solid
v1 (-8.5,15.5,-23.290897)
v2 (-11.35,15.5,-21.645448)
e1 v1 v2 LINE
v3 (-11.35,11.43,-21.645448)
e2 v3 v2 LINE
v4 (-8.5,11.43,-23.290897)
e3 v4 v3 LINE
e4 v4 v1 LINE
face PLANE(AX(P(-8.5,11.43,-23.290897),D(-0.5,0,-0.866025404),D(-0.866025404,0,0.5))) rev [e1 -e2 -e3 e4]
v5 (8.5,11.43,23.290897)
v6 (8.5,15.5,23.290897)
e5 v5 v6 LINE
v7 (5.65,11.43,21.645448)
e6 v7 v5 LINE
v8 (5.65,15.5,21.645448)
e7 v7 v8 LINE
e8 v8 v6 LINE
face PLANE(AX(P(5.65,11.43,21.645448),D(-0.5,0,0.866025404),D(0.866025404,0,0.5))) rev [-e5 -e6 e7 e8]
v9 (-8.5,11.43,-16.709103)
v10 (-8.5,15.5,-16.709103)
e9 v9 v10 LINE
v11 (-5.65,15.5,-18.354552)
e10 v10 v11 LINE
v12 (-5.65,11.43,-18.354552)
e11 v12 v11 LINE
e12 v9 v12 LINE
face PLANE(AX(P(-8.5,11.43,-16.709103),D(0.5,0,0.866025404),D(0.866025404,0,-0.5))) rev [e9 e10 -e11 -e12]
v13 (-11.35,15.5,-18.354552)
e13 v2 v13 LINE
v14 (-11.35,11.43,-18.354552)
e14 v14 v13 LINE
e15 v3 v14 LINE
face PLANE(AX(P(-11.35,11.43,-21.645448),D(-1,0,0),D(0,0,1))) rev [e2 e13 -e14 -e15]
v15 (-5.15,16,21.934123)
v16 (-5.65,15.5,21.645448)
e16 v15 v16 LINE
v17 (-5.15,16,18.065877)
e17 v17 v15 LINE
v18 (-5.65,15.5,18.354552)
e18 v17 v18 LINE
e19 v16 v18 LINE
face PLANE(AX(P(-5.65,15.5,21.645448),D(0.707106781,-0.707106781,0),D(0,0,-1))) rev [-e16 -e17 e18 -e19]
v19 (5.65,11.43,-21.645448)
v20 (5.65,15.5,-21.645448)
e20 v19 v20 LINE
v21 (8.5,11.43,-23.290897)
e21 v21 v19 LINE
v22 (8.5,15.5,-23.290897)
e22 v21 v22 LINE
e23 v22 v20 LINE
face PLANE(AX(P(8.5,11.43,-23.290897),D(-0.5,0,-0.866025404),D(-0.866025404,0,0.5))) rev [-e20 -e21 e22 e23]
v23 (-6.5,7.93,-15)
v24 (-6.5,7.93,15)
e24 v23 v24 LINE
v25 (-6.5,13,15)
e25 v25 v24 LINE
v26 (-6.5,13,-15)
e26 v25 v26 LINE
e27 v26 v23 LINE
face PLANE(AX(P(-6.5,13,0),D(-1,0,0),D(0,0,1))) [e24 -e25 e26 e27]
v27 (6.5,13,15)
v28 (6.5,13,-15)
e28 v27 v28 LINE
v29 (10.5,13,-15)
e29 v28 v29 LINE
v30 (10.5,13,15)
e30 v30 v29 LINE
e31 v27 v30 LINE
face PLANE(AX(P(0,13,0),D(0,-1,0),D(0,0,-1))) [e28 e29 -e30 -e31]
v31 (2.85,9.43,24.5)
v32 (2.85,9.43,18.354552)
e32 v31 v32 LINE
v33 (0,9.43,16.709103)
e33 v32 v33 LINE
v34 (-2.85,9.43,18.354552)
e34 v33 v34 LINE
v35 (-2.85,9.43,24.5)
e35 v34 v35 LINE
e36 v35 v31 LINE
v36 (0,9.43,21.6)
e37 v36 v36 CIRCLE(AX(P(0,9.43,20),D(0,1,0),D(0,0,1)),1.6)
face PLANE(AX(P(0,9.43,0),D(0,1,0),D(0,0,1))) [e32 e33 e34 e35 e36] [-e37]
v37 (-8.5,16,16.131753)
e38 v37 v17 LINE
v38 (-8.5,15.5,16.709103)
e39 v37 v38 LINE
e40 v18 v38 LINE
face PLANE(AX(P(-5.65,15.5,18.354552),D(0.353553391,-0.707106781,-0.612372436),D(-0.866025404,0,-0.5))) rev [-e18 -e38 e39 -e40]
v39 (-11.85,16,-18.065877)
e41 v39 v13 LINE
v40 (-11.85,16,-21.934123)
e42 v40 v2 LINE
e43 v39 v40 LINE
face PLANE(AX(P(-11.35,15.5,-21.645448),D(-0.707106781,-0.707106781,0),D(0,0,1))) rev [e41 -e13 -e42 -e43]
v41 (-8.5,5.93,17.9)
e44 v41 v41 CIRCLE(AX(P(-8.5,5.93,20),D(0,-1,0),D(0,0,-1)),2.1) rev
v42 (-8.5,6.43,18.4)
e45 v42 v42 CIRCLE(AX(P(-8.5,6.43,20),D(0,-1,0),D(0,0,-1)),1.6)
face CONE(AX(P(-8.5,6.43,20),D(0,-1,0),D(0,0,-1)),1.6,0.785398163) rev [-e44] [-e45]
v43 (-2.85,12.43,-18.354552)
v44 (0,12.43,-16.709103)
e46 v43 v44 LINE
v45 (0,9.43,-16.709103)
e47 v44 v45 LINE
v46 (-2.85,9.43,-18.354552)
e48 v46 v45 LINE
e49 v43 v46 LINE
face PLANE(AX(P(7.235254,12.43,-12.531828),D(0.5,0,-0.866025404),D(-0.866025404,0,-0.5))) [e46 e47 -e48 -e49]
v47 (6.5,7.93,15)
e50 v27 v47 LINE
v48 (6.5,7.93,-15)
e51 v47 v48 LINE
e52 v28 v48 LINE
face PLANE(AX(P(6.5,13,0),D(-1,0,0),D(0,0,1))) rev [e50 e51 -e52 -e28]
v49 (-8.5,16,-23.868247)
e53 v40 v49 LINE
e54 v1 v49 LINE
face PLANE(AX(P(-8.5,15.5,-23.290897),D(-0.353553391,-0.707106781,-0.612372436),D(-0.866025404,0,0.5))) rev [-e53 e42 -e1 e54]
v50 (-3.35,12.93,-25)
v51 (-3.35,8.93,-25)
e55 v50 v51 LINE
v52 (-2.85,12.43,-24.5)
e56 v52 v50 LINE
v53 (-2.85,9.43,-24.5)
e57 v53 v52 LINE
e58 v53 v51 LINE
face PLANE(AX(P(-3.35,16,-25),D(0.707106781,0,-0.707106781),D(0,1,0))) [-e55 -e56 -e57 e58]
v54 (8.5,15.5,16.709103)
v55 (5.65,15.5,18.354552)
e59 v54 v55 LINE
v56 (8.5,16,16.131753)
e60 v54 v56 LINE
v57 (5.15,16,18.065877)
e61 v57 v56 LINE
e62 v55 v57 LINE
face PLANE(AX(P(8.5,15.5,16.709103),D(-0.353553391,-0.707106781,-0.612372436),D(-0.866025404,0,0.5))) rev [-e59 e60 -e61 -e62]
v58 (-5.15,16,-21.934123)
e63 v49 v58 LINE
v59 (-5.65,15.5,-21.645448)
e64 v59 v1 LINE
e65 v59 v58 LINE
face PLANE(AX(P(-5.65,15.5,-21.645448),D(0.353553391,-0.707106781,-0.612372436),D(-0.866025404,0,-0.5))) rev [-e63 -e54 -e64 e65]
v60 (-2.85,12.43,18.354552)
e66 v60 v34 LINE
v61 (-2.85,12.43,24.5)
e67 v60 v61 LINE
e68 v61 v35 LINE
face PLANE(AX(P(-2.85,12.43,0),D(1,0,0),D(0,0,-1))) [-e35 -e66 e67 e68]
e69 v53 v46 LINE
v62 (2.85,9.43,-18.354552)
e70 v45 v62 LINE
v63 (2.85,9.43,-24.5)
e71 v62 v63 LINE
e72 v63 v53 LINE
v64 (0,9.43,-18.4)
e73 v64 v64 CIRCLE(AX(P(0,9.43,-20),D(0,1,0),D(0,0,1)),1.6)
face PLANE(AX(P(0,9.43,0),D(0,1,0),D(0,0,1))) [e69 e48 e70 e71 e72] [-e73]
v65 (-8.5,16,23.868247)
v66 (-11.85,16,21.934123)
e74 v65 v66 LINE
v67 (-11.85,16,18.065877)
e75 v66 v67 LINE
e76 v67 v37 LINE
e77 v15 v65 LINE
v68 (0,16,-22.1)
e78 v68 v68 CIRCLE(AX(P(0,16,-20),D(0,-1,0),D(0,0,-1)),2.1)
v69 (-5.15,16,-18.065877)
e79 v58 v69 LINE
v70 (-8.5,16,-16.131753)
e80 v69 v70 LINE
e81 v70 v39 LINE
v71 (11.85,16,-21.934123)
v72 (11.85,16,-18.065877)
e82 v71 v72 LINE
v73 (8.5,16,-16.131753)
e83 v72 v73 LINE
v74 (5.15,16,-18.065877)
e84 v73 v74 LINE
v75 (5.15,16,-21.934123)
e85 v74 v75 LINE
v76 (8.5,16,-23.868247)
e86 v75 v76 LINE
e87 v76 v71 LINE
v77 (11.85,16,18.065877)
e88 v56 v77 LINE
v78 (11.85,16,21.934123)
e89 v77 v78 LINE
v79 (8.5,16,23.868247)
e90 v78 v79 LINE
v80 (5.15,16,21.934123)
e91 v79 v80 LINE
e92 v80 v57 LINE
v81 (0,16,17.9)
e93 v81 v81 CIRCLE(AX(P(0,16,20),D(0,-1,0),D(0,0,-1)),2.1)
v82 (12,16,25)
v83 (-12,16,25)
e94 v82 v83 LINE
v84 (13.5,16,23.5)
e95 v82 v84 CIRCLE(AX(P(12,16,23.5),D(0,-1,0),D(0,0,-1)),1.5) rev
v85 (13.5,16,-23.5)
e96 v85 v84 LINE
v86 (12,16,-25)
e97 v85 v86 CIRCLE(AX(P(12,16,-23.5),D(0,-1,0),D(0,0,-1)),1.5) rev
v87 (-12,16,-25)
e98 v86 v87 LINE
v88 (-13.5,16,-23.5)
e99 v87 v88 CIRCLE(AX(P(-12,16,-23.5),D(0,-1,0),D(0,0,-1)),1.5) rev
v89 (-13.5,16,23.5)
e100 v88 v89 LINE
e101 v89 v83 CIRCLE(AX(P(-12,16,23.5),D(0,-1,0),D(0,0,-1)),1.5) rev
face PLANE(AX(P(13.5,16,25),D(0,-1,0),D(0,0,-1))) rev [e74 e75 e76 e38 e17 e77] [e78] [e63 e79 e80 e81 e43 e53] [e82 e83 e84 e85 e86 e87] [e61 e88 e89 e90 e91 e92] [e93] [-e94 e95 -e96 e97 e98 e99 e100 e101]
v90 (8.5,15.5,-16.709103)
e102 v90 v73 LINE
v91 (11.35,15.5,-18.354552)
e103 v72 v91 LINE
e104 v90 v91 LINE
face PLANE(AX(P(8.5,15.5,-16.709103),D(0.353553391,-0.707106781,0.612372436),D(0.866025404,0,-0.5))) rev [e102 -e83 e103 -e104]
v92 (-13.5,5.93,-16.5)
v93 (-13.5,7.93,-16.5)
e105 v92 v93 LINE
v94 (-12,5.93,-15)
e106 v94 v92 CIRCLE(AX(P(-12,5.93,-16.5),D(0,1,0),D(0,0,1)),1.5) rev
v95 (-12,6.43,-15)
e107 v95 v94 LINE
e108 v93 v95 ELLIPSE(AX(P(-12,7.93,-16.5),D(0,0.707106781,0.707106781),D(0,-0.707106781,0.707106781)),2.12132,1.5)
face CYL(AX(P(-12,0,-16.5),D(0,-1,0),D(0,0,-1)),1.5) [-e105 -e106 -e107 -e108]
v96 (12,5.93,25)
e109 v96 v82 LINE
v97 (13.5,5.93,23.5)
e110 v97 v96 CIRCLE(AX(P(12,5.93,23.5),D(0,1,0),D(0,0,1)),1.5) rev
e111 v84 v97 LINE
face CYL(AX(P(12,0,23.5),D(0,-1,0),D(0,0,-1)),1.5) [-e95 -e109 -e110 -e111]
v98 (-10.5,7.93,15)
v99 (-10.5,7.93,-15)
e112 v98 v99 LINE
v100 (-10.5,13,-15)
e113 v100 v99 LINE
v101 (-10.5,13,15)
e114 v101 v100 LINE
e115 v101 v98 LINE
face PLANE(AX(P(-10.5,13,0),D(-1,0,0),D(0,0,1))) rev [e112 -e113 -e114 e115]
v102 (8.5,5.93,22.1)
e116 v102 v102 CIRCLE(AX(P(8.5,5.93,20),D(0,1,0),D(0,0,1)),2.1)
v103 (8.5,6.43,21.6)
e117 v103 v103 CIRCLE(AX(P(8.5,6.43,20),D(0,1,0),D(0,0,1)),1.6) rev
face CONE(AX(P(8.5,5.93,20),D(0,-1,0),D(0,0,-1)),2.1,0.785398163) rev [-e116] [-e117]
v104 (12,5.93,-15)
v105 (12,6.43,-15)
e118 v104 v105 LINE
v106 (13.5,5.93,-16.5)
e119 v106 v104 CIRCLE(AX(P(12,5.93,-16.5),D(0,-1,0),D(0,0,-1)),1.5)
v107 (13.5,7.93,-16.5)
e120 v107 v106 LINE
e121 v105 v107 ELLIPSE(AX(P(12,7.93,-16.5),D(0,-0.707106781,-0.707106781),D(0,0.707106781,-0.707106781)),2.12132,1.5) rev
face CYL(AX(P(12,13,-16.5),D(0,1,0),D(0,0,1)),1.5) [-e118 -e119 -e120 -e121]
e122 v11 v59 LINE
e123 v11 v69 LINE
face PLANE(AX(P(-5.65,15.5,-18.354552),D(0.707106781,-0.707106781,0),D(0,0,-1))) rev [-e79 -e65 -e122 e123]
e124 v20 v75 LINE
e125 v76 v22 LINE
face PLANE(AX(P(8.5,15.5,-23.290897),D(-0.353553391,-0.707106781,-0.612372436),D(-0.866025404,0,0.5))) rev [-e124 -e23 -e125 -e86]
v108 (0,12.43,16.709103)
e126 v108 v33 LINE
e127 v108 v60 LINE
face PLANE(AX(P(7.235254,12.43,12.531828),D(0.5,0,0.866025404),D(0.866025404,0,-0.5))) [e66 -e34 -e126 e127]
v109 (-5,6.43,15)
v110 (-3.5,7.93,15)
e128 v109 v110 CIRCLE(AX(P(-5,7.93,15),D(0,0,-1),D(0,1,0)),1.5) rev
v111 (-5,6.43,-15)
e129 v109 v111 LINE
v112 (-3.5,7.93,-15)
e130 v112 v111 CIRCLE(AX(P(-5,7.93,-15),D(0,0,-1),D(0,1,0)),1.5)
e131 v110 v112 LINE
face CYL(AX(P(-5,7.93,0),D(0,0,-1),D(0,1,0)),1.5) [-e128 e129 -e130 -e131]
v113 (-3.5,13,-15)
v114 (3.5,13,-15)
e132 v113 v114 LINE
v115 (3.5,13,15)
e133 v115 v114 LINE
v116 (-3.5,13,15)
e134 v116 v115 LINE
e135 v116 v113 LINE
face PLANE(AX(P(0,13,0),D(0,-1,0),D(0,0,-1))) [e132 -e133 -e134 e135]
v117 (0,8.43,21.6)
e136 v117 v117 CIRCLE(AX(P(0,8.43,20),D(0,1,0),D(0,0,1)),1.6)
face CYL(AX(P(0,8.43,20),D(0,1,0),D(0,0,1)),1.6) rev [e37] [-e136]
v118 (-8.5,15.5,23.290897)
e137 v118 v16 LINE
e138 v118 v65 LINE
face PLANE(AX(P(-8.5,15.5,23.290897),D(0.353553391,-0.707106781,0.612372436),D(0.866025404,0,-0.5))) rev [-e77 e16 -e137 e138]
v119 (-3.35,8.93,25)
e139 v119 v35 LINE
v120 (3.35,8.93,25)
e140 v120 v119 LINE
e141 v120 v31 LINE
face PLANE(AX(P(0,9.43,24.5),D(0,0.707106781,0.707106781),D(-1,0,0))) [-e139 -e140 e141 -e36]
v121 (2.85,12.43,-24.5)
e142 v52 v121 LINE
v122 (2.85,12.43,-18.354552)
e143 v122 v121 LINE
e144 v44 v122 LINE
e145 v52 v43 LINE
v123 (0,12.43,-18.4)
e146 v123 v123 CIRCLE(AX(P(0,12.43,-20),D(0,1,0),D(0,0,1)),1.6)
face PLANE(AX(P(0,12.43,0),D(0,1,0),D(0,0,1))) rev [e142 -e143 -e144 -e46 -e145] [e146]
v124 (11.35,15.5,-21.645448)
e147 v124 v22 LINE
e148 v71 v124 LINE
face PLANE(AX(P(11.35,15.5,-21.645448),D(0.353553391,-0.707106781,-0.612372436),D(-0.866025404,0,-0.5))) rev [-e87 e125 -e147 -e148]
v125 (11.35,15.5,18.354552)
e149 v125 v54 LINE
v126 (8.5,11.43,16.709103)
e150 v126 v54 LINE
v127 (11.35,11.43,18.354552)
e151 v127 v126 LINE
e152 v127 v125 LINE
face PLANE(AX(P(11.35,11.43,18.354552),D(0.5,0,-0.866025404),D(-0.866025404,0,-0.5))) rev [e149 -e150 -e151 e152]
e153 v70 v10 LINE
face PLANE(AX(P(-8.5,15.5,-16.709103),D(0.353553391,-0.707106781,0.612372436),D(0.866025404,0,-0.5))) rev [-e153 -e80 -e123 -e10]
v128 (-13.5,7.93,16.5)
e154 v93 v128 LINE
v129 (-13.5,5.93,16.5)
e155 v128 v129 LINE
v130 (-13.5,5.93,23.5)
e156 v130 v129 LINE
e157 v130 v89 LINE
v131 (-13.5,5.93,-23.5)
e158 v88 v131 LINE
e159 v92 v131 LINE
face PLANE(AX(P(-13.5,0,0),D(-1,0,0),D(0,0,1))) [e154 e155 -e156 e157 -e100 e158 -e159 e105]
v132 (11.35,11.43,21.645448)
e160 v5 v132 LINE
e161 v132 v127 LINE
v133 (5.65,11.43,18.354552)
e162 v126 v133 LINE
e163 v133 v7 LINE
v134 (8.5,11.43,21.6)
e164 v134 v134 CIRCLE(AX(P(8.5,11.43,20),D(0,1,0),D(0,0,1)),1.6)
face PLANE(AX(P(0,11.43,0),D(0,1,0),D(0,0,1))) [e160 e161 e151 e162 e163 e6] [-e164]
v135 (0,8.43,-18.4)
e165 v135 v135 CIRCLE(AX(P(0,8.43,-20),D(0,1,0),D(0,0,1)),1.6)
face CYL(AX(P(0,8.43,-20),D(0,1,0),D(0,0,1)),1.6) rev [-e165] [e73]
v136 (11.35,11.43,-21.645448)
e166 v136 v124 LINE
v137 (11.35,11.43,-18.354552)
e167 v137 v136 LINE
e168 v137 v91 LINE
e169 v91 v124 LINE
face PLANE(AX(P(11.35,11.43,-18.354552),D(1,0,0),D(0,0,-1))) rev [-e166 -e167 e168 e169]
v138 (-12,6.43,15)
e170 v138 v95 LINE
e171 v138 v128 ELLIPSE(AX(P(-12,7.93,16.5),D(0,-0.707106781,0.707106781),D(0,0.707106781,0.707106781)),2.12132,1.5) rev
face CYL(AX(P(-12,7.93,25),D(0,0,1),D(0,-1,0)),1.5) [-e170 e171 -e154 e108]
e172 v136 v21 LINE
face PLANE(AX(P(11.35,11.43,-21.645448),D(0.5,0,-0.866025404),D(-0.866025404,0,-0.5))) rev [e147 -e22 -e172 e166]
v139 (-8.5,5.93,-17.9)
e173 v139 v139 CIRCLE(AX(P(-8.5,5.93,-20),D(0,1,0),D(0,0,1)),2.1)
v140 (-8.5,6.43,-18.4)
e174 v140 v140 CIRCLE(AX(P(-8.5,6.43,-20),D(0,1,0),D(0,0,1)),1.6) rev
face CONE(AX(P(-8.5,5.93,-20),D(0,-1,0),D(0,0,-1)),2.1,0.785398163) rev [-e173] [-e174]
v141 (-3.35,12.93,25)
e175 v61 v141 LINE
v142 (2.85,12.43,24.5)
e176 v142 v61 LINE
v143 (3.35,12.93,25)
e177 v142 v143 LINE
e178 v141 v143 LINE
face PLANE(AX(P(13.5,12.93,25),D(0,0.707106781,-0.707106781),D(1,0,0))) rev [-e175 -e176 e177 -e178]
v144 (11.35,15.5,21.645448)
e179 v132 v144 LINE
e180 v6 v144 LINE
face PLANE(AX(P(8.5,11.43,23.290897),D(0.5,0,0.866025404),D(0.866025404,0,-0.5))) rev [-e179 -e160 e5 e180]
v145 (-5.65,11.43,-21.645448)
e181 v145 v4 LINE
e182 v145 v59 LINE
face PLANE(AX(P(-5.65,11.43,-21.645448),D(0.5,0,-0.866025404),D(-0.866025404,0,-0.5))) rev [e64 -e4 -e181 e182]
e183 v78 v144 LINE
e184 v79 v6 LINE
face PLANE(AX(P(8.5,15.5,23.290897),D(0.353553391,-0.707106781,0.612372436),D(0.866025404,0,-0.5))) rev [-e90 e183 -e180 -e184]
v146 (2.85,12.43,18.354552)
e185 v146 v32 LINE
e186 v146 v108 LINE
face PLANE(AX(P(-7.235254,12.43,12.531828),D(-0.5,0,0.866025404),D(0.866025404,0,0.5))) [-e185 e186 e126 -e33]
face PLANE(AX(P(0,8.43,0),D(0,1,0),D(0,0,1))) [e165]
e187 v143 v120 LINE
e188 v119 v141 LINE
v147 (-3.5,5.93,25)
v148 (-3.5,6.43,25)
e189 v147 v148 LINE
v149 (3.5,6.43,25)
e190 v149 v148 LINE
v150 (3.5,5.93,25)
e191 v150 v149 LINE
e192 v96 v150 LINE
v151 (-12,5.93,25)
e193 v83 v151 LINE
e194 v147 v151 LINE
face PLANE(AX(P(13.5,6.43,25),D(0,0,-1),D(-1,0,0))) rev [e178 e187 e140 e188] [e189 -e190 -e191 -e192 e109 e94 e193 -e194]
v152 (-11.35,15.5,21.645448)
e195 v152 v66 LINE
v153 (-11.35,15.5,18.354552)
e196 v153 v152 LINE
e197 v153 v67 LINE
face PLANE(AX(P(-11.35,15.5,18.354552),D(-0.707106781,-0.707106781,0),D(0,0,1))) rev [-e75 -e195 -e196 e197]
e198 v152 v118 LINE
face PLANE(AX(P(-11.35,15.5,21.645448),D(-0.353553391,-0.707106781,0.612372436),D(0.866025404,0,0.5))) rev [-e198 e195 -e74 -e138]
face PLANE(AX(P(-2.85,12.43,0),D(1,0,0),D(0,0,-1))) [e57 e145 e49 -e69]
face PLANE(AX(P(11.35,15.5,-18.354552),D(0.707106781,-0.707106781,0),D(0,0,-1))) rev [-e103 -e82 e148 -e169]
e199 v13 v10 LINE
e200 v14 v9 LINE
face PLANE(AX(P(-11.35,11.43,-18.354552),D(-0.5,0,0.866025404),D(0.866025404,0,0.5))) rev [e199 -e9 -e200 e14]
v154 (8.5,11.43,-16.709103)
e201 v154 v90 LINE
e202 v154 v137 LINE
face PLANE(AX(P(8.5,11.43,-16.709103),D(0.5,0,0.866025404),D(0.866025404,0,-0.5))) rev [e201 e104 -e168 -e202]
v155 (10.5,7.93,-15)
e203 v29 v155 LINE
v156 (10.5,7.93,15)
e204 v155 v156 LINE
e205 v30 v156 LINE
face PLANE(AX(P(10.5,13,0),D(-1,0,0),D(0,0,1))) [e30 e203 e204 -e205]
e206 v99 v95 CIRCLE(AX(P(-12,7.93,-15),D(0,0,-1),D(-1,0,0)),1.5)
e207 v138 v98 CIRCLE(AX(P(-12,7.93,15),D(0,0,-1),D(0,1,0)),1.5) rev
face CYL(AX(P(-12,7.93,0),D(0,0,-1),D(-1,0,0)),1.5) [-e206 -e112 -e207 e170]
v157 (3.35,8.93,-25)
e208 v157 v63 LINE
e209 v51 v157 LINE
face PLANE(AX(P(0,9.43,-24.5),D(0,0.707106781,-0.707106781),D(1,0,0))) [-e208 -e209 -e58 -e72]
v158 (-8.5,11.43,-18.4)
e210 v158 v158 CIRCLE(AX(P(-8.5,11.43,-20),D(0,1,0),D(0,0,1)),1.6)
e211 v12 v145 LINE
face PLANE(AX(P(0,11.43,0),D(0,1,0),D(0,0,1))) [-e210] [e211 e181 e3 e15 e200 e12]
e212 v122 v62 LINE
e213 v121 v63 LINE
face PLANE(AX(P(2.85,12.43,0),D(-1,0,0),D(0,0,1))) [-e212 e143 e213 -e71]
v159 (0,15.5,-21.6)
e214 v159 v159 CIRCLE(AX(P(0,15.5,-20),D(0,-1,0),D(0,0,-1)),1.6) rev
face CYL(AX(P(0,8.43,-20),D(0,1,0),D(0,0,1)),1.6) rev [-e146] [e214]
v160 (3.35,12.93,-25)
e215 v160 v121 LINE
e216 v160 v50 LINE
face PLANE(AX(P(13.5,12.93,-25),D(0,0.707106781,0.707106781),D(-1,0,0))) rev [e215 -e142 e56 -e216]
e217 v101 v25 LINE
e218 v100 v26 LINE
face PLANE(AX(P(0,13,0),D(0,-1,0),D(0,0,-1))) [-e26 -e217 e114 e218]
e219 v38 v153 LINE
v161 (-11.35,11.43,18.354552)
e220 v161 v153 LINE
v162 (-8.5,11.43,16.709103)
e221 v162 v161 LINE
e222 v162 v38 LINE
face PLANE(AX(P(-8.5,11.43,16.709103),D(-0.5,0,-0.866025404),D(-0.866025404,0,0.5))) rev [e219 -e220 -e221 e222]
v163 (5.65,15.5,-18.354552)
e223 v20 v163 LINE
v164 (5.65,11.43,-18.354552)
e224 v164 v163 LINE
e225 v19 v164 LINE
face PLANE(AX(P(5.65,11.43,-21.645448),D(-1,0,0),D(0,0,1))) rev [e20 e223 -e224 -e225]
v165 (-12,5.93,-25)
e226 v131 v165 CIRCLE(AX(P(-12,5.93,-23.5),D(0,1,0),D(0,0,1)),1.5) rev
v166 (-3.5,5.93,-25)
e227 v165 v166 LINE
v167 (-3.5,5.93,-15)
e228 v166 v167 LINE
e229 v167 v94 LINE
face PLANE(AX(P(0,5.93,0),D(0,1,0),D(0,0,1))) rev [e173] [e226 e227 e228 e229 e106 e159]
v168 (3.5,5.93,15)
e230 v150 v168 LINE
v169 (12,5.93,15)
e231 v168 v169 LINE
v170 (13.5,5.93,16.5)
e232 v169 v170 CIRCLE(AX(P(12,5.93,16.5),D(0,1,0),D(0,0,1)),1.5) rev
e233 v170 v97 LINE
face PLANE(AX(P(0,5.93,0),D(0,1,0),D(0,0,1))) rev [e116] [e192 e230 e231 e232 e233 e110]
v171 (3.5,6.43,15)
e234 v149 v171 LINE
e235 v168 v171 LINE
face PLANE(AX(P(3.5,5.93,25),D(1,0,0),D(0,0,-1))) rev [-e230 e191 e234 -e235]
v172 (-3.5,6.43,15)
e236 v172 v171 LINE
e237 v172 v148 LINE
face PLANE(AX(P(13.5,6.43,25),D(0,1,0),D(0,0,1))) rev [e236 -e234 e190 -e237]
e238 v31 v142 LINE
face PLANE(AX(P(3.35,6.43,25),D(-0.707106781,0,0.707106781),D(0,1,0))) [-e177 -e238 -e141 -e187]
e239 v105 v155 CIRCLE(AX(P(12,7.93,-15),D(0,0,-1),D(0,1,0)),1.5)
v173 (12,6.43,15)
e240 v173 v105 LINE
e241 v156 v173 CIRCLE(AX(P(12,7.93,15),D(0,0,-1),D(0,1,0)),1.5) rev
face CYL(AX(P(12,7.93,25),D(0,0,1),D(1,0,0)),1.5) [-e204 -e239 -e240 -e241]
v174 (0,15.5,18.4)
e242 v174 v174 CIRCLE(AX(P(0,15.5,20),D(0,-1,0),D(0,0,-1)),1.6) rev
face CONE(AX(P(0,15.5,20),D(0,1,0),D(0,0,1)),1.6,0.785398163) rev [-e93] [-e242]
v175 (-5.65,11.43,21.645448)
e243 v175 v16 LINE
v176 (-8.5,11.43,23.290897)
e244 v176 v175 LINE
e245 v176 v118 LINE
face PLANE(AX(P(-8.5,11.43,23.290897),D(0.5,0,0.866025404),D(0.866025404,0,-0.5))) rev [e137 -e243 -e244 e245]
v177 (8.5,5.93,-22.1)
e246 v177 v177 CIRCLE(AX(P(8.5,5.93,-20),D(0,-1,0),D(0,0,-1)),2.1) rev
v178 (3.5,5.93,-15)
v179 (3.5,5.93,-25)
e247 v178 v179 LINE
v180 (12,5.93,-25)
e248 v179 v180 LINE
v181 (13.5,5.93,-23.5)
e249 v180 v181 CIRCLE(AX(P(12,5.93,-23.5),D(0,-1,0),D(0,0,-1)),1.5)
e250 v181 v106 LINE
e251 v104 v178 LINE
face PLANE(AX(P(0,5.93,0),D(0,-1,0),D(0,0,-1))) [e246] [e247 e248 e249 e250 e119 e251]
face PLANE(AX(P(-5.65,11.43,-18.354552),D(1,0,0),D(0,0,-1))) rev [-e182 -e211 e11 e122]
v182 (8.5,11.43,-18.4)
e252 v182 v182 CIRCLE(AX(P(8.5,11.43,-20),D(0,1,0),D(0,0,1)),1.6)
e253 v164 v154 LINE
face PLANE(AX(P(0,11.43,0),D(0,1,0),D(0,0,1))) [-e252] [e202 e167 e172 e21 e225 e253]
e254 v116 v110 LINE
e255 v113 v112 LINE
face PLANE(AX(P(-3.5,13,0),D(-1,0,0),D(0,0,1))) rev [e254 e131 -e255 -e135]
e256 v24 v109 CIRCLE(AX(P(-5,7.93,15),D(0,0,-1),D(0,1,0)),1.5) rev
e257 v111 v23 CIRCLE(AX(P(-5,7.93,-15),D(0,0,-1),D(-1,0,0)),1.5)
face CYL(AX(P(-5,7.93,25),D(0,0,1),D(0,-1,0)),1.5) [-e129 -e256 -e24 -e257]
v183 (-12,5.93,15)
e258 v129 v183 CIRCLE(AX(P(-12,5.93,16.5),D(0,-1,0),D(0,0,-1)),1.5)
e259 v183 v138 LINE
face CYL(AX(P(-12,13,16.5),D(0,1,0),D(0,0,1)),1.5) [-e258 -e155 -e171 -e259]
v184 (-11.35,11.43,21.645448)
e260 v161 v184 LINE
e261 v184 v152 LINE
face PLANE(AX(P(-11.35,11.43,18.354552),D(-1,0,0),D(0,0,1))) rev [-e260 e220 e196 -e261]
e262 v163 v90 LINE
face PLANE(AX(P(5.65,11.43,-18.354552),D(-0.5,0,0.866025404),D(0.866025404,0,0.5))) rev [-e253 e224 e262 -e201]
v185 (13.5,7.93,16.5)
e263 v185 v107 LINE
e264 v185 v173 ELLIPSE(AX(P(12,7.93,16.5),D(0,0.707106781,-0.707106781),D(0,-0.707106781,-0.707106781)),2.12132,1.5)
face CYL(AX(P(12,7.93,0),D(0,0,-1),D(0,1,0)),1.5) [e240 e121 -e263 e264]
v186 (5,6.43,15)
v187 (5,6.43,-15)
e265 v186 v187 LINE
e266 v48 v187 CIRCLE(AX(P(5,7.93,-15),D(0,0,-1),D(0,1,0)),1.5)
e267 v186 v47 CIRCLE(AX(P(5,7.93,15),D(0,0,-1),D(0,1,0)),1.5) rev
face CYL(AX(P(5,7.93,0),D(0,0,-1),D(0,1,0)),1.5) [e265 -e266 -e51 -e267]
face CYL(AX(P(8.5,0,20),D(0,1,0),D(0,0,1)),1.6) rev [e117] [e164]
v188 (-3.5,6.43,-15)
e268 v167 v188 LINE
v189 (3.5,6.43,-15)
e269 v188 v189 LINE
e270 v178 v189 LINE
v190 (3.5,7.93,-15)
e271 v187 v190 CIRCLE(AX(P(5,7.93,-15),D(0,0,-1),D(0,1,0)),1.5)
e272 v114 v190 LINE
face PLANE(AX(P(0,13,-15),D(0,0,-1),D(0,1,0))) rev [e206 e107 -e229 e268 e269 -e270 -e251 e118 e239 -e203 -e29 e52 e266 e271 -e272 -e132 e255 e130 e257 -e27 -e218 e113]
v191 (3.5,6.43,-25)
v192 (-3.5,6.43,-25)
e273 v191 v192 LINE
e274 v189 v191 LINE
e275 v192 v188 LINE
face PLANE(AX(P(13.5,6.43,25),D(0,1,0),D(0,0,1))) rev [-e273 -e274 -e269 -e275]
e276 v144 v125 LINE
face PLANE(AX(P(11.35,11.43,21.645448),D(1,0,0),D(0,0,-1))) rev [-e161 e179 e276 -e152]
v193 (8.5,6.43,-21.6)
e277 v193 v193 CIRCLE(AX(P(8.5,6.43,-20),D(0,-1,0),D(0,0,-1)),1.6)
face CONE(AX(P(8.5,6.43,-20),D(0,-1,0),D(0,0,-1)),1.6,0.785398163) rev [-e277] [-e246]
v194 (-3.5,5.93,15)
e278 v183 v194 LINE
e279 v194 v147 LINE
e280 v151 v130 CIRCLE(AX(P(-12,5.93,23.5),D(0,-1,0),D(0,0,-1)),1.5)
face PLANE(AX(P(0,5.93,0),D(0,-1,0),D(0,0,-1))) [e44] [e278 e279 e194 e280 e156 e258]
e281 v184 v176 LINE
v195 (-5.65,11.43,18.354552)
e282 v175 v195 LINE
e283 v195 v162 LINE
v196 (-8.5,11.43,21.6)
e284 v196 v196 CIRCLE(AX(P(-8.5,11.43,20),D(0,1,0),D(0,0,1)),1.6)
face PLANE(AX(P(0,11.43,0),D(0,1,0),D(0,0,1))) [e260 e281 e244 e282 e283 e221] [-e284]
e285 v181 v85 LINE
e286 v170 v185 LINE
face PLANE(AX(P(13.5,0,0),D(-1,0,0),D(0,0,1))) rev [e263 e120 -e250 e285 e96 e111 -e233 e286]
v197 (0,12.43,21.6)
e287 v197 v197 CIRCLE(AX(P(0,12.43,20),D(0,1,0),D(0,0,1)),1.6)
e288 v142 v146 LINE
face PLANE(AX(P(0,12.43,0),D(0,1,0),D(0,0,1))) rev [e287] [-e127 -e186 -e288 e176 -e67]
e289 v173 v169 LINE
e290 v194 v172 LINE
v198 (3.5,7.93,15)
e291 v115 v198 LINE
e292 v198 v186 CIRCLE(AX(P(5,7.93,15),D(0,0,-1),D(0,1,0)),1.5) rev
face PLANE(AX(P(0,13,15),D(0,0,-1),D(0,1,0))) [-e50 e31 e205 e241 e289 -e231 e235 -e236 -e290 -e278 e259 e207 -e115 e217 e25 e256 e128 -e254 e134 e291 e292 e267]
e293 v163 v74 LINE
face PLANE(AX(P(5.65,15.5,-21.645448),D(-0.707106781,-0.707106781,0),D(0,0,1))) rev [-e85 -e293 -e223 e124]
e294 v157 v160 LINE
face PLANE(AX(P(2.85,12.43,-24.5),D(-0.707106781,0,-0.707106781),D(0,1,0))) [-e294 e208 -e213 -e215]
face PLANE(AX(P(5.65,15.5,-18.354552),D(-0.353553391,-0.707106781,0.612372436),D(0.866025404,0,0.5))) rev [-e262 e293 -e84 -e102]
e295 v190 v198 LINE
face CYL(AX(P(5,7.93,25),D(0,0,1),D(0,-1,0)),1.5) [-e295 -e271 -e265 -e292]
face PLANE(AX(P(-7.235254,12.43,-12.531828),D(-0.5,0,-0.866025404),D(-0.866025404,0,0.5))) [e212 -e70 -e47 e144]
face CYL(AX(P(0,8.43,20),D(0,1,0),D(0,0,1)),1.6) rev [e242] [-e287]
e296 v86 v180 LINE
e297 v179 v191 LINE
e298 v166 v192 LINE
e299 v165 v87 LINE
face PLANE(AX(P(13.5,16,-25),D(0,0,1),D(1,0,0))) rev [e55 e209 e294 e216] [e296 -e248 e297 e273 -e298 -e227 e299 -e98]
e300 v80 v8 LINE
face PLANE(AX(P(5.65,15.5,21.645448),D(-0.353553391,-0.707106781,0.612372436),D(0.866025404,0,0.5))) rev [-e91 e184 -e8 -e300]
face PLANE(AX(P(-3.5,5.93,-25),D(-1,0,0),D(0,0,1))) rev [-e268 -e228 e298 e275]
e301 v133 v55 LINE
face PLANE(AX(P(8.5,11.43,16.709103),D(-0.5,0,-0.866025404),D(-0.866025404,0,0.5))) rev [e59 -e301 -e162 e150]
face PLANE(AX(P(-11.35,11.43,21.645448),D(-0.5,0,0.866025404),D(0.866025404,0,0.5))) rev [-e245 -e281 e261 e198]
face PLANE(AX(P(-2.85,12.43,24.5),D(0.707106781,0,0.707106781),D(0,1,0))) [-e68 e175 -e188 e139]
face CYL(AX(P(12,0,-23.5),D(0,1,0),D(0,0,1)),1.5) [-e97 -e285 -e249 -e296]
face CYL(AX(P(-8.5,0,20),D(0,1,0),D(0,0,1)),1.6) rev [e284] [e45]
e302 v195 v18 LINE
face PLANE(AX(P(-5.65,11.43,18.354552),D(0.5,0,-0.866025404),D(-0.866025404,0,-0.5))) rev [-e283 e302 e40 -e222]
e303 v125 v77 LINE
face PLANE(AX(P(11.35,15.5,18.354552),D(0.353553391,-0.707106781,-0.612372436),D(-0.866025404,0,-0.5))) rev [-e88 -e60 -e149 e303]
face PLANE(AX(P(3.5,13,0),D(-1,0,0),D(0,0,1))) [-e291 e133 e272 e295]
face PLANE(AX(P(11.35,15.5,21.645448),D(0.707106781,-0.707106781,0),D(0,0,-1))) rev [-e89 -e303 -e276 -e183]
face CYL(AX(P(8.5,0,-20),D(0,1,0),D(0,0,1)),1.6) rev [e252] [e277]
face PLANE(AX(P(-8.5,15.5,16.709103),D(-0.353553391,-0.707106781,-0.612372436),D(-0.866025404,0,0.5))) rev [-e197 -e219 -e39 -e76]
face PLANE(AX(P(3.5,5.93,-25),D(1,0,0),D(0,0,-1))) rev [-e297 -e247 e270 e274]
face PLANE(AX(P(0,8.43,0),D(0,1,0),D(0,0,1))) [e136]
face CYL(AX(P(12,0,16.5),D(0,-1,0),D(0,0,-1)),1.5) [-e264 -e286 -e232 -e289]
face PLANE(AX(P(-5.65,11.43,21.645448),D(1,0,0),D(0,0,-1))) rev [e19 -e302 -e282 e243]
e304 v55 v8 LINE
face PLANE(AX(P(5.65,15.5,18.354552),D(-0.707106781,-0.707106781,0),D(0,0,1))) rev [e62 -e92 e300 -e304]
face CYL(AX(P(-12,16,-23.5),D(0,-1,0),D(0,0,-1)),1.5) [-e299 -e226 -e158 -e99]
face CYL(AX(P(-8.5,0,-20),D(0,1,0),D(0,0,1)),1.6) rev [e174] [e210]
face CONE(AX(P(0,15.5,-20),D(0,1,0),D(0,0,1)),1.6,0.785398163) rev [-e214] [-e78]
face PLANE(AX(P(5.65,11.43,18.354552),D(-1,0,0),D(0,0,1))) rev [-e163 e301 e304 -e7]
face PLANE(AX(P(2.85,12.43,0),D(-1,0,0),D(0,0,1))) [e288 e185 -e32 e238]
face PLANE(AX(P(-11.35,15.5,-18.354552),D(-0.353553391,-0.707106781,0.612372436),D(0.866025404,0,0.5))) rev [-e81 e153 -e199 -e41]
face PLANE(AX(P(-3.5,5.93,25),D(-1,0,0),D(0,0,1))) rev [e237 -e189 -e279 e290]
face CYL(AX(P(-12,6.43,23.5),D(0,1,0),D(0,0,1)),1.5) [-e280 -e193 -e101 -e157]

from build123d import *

# Parameters (mm, degrees)
SKETCH_1_W          = 50
SKETCH_1_H          = 9.57
EXTRUDE_1_DEPTH     = 13.5
CUT_EXTRUDE_1_DEPTH = 4.57
CUT_EXTRUDE_START   = -6.57
SKETCH_2_3_R        = 1.6
CUT_EXTRUDE_2_DEPTH = 3
SKETCH_2_5_R        = 1.6
CUT_EXTRUDE_4_DEPTH = 7.57
SKETCH_3_W          = 4
SKETCH_3_H          = 30
SKETCH_3_W_2        = 7
CUT_EXTRUDE_5_DEPTH = 6.57
SKETCH_4_W          = 10
SKETCH_4_H          = 10
EXTRUDE_2_DEPTH     = 0.5
SKETCH_2_4_R        = 1.6
CUT_EXTRUDE_3_DEPTH = 16
FILLET_1_R          = 1.5
CHAMFER_1_SIZE      = 0.5


with BuildPart() as part:
    # Эскиз1 → Бобышка-Вытянуть1 (new, symmetric)
    with BuildSketch(Plane(origin=(0, 0, 0), x_dir=(0, 0, -1), z_dir=(1, 0, 0))):
        with Locations((0, 11.215)):
            Rectangle(SKETCH_1_W, SKETCH_1_H)
    extrude(amount=EXTRUDE_1_DEPTH, both=True)

    # Эскиз2 → Вырез-Вытянуть1 (cut)
    with BuildSketch(Plane(origin=(0, 16, 0), x_dir=(1, 0, 0), z_dir=(0, 1, 0))):
        Polygon((-8.5, 16.709103466), (-5.65, 18.354551733), (-5.65, 21.645448267), (-8.5, 23.290896534), (-11.35, 21.645448267), (-11.35, 18.354551733), align=None)
        Polygon((8.5, 16.709103466), (11.35, 18.354551733), (11.35, 21.645448267), (8.5, 23.290896534), (5.65, 21.645448267), (5.65, 18.354551733), align=None)
        Polygon((8.5, -23.290896534), (11.35, -21.645448267), (11.35, -18.354551733), (8.5, -16.709103466), (5.65, -18.354551733), (5.65, -21.645448267), align=None)
        Polygon((-8.5, -16.709103466), (-11.35, -18.354551733), (-11.35, -21.645448267), (-8.5, -23.290896534), (-5.65, -21.645448267), (-5.65, -18.354551733), align=None)
    extrude(amount=-CUT_EXTRUDE_1_DEPTH, mode=Mode.SUBTRACT)

    # Эскиз2<3> → Вырез-Вытянуть2 (cut)
    # profile 1 of 6: a face of its own
    with BuildSketch(Plane(origin=(0, 16, 0), x_dir=(1, 0, 0), z_dir=(0, 1, 0)).offset(CUT_EXTRUDE_START)):
        Polygon((-2.85, 21.645448267), (-2.85, 18.354551733), (0, 16.709103466), (2.85, 18.354551733), (2.85, 21.645448267), (0, 23.290896534), align=None)
        with Locations((0, 20)):
            Circle(SKETCH_2_3_R, mode=Mode.SUBTRACT)
    # profile 2 of 6: a face of its own
    with BuildSketch(Plane(origin=(0, 16, 0), x_dir=(1, 0, 0), z_dir=(0, 1, 0)).offset(CUT_EXTRUDE_START)):
        with Locations((0, 20)):
            Circle(SKETCH_2_3_R)
    # profile 3 of 6: a face of its own
    with BuildSketch(Plane(origin=(0, 16, 0), x_dir=(1, 0, 0), z_dir=(0, 1, 0)).offset(CUT_EXTRUDE_START)):
        Polygon((-2.85, 25), (-2.85, 21.645448267), (0, 23.290896534), (2.85, 21.645448267), (2.85, 25), align=None)
    # profile 4 of 6: a face of its own
    with BuildSketch(Plane(origin=(0, 16, 0), x_dir=(1, 0, 0), z_dir=(0, 1, 0)).offset(CUT_EXTRUDE_START)):
        Polygon((-2.85, -18.354551733), (-2.85, -21.645448267), (0, -23.290896534), (2.85, -21.645448267), (2.85, -18.354551733), (0, -16.709103466), align=None)
        with Locations((0, -20)):
            Circle(SKETCH_2_3_R, mode=Mode.SUBTRACT)
    # profile 5 of 6: a face of its own
    with BuildSketch(Plane(origin=(0, 16, 0), x_dir=(1, 0, 0), z_dir=(0, 1, 0)).offset(CUT_EXTRUDE_START)):
        with Locations((0, -20)):
            Circle(SKETCH_2_3_R)
    # profile 6 of 6: a face of its own
    with BuildSketch(Plane(origin=(0, 16, 0), x_dir=(1, 0, 0), z_dir=(0, 1, 0)).offset(CUT_EXTRUDE_START)):
        Polygon((2.85, -21.645448267), (0, -23.290896534), (-2.85, -21.645448267), (-2.85, -25), (2.85, -25), align=None)
    extrude(amount=CUT_EXTRUDE_2_DEPTH, mode=Mode.SUBTRACT)

    # Эскиз2<5> → Вырез-Вытянуть4 (cut)
    with BuildSketch(Plane(origin=(0, 16, 0), x_dir=(1, 0, 0), z_dir=(0, 1, 0))):
        with Locations(Location((0, -20, 0), (0, 0, 270))):
            Circle(SKETCH_2_5_R)
        with Locations(Location((0, 20, 0), (0, 0, 270))):
            Circle(SKETCH_2_5_R)
    extrude(amount=-CUT_EXTRUDE_4_DEPTH, mode=Mode.SUBTRACT)

    # Эскиз3 → Вырез-Вытянуть5 (cut)
    with BuildSketch(Plane.XZ.offset(-6.43)):
        with Locations((-8.5, 0)):
            Rectangle(SKETCH_3_W, SKETCH_3_H)
        Rectangle(SKETCH_3_W_2, SKETCH_3_H)
        with Locations((8.5, 0)):
            Rectangle(SKETCH_3_W, SKETCH_3_H)
    extrude(amount=-CUT_EXTRUDE_5_DEPTH, mode=Mode.SUBTRACT)

    # Эскиз4 → Бобышка-Вытянуть2 (add)
    with BuildSketch(Plane(origin=(0, 6.43, 0), x_dir=(-1, 0, 0), z_dir=(0, -1, 0))):
        with Locations((8.5, -20)):
            Rectangle(SKETCH_4_W, SKETCH_4_H)
        with Locations((-8.5, -20)):
            Rectangle(SKETCH_4_W, SKETCH_4_H)
        with Locations((8.5, 20)):
            Rectangle(SKETCH_4_W, SKETCH_4_H)
        with Locations((-8.5, 20)):
            Rectangle(SKETCH_4_W, SKETCH_4_H)
    extrude(amount=EXTRUDE_2_DEPTH)

    # Эскиз2<4> → Вырез-Вытянуть3 (cut)
    with BuildSketch(Plane(origin=(0, 16, 0), x_dir=(1, 0, 0), z_dir=(0, 1, 0))):
        with Locations(Location((8.5, 20, 0), (0, 0, 270))):
            Circle(SKETCH_2_4_R)
        with Locations(Location((-8.5, 20, 0), (0, 0, 270))):
            Circle(SKETCH_2_4_R)
        with Locations(Location((8.5, -20, 0), (0, 0, 270))):
            Circle(SKETCH_2_4_R)
        with Locations(Location((-8.5, -20, 0), (0, 0, 270))):
            Circle(SKETCH_2_4_R)
    extrude(amount=-CUT_EXTRUDE_3_DEPTH, mode=Mode.SUBTRACT)

    # Скругление1
    # the kernel refuses this fillet: 1.5 mm, written as the material it takes off along each edge
    with BuildSketch(Plane(origin=(-13.5, 2.18, 25), x_dir=(0, 0, -1), z_dir=(0, 1, 0)), Plane(origin=(13.5, 2.18, 25), x_dir=(-1, 0, 0), z_dir=(0, 1, 0)), Plane(origin=(-13.5, 19.75, -25), x_dir=(0, 0, 1), z_dir=(0, -1, 0)), Plane(origin=(13.5, 19.75, -25), x_dir=(-1, 0, 0), z_dir=(0, -1, 0))) as fillet_1_piece_1:
        with BuildLine():
            CenterArc((FILLET_1_R, -FILLET_1_R), FILLET_1_R, 90, 90)
            Line((0, -FILLET_1_R), (0, 0))
            Line((0, 0), (FILLET_1_R, 0))
        make_face()
    extrude(amount=17.57, mode=Mode.SUBTRACT)
    with BuildSketch(Plane(origin=(13.5, 6.43, 15), x_dir=(0, 0, 1), z_dir=(0, -1, 0)), Plane(origin=(-13.5, 6.43, 15), x_dir=(1, 0, 0), z_dir=(0, -1, 0))) as fillet_1_piece_2:
        with BuildLine():
            CenterArc((FILLET_1_R, FILLET_1_R), FILLET_1_R, 180, 90)
            Line((0, FILLET_1_R), (0, 0))
            Line((0, 0), (FILLET_1_R, 0))
        make_face()
    extrude(amount=4.25, mode=Mode.SUBTRACT)
    with BuildSketch(Plane(origin=(13.5, 6.43, -15), x_dir=(0, 0, -1), z_dir=(0, -1, 0)), Plane(origin=(-13.5, 6.43, -15), x_dir=(1, 0, 0), z_dir=(0, -1, 0))) as fillet_1_piece_3:
        with BuildLine():
            CenterArc((FILLET_1_R, -FILLET_1_R), FILLET_1_R, 90, 90)
            Line((0, -FILLET_1_R), (0, 0))
            Line((0, 0), (FILLET_1_R, 0))
        make_face()
    extrude(amount=4.25, mode=Mode.SUBTRACT)
    with BuildSketch(Plane(origin=(6.5, 6.43, -15), x_dir=(0, 1, 0), z_dir=(0, 0, 1)), Plane(origin=(3.5, 6.43, 15), x_dir=(0, 1, 0), z_dir=(0, 0, -1)), Plane(origin=(-6.5, 6.43, 15), x_dir=(0, 1, 0), z_dir=(0, 0, -1))) as fillet_1_piece_4:
        with BuildLine():
            CenterArc((FILLET_1_R, FILLET_1_R), FILLET_1_R, 180, 90)
            Line((0, FILLET_1_R), (0, 0))
            Line((0, 0), (FILLET_1_R, 0))
        make_face()
    extrude(amount=30, mode=Mode.SUBTRACT)
    with BuildSketch(Plane(origin=(13.5, 6.43, 15), x_dir=(0, 1, 0), z_dir=(0, 0, -1)), Plane(origin=(10.5, 6.43, 15), x_dir=(1, 0, 0), z_dir=(0, 0, -1)), Plane(origin=(-3.5, 6.43, -15), x_dir=(-1, 0, 0), z_dir=(0, 0, 1)), Plane(origin=(-10.5, 6.43, -15), x_dir=(-1, 0, 0), z_dir=(0, 0, 1)), Plane(origin=(-13.5, 6.43, 15), x_dir=(1, 0, 0), z_dir=(0, 0, -1))) as fillet_1_piece_5:
        with BuildLine():
            CenterArc((FILLET_1_R, -FILLET_1_R), FILLET_1_R, 90, 90)
            Line((0, -FILLET_1_R), (0, 0))
            Line((0, 0), (FILLET_1_R, 0))
        make_face()
    extrude(amount=30, mode=Mode.SUBTRACT)
    with BuildSketch(Plane(origin=(13.5, 6.43, 18.75), x_dir=(0, 1, 0), z_dir=(0, 0, -1))) as fillet_1_piece_6a_section:
        with BuildLine():
            CenterArc((FILLET_1_R, -FILLET_1_R), FILLET_1_R, 90, 90)
            Line((0, -FILLET_1_R), (0, 0))
            Line((0, 0), (FILLET_1_R, 0))
        make_face()
    fillet_1_piece_6a = extrude(amount=33.75, mode=Mode.PRIVATE)
    fillet_1_piece_6a = split(fillet_1_piece_6a, bisect_by=Plane(origin=(13.160407329, 6.769592671, 15), z_dir=(0, 0, 1)), keep=Keep.TOP, mode=Mode.PRIVATE)
    with BuildSketch(Plane(origin=(13.5, 10.18, 15), x_dir=(0, 0, 1), z_dir=(0, -1, 0))) as fillet_1_piece_6b_section:
        with BuildLine():
            CenterArc((FILLET_1_R, FILLET_1_R), FILLET_1_R, 180, 90)
            Line((0, FILLET_1_R), (0, 0))
            Line((0, 0), (FILLET_1_R, 0))
        make_face()
    fillet_1_piece_6b = extrude(amount=8, mode=Mode.PRIVATE)
    fillet_1_piece_6b = split(fillet_1_piece_6b, bisect_by=Plane(origin=(13.160407329, 6.43, 15.339592671), z_dir=(0, 1, 0)), keep=Keep.TOP, mode=Mode.PRIVATE)
    fillet_1_piece_6 = fillet_1_piece_6a & fillet_1_piece_6b
    add(fillet_1_piece_6, mode=Mode.SUBTRACT)
    with BuildSketch(Plane(origin=(13.5, 6.43, 15), x_dir=(0, 1, 0), z_dir=(0, 0, -1))) as fillet_1_piece_7a_section:
        with BuildLine():
            CenterArc((FILLET_1_R, -FILLET_1_R), FILLET_1_R, 90, 90)
            Line((0, -FILLET_1_R), (0, 0))
            Line((0, 0), (FILLET_1_R, 0))
        make_face()
    fillet_1_piece_7a = extrude(amount=33.75, mode=Mode.PRIVATE)
    fillet_1_piece_7a = split(fillet_1_piece_7a, bisect_by=Plane(origin=(13.160407329, 6.769592671, -15), z_dir=(0, 0, -1)), keep=Keep.TOP, mode=Mode.PRIVATE)
    with BuildSketch(Plane(origin=(13.5, 10.18, -15), x_dir=(0, 0, -1), z_dir=(0, -1, 0))) as fillet_1_piece_7b_section:
        with BuildLine():
            CenterArc((FILLET_1_R, -FILLET_1_R), FILLET_1_R, 90, 90)
            Line((0, -FILLET_1_R), (0, 0))
            Line((0, 0), (FILLET_1_R, 0))
        make_face()
    fillet_1_piece_7b = extrude(amount=8, mode=Mode.PRIVATE)
    fillet_1_piece_7b = split(fillet_1_piece_7b, bisect_by=Plane(origin=(13.160407329, 6.43, -15.339592671), z_dir=(0, 1, 0)), keep=Keep.TOP, mode=Mode.PRIVATE)
    fillet_1_piece_7 = fillet_1_piece_7a & fillet_1_piece_7b
    add(fillet_1_piece_7, mode=Mode.SUBTRACT)
    with BuildSketch(Plane(origin=(-13.5, 6.43, 15), x_dir=(1, 0, 0), z_dir=(0, 0, -1))) as fillet_1_piece_8a_section:
        with BuildLine():
            CenterArc((FILLET_1_R, -FILLET_1_R), FILLET_1_R, 90, 90)
            Line((0, -FILLET_1_R), (0, 0))
            Line((0, 0), (FILLET_1_R, 0))
        make_face()
    fillet_1_piece_8a = extrude(amount=33.75, mode=Mode.PRIVATE)
    fillet_1_piece_8a = split(fillet_1_piece_8a, bisect_by=Plane(origin=(-13.160407329, 6.769592671, -15), z_dir=(0, 0, -1)), keep=Keep.TOP, mode=Mode.PRIVATE)
    with BuildSketch(Plane(origin=(-13.5, 10.18, -15), x_dir=(1, 0, 0), z_dir=(0, -1, 0))) as fillet_1_piece_8b_section:
        with BuildLine():
            CenterArc((FILLET_1_R, -FILLET_1_R), FILLET_1_R, 90, 90)
            Line((0, -FILLET_1_R), (0, 0))
            Line((0, 0), (FILLET_1_R, 0))
        make_face()
    fillet_1_piece_8b = extrude(amount=8, mode=Mode.PRIVATE)
    fillet_1_piece_8b = split(fillet_1_piece_8b, bisect_by=Plane(origin=(-13.160407329, 6.43, -15.339592671), z_dir=(0, 1, 0)), keep=Keep.TOP, mode=Mode.PRIVATE)
    fillet_1_piece_8 = fillet_1_piece_8a & fillet_1_piece_8b
    add(fillet_1_piece_8, mode=Mode.SUBTRACT)
    with BuildSketch(Plane(origin=(-13.5, 6.43, 18.75), x_dir=(1, 0, 0), z_dir=(0, 0, -1))) as fillet_1_piece_9a_section:
        with BuildLine():
            CenterArc((FILLET_1_R, -FILLET_1_R), FILLET_1_R, 90, 90)
            Line((0, -FILLET_1_R), (0, 0))
            Line((0, 0), (FILLET_1_R, 0))
        make_face()
    fillet_1_piece_9a = extrude(amount=33.75, mode=Mode.PRIVATE)
    fillet_1_piece_9a = split(fillet_1_piece_9a, bisect_by=Plane(origin=(-13.160407329, 6.769592671, 15), z_dir=(0, 0, 1)), keep=Keep.TOP, mode=Mode.PRIVATE)
    with BuildSketch(Plane(origin=(-13.5, 10.18, 15), x_dir=(1, 0, 0), z_dir=(0, -1, 0))) as fillet_1_piece_9b_section:
        with BuildLine():
            CenterArc((FILLET_1_R, FILLET_1_R), FILLET_1_R, 180, 90)
            Line((0, FILLET_1_R), (0, 0))
            Line((0, 0), (FILLET_1_R, 0))
        make_face()
    fillet_1_piece_9b = extrude(amount=8, mode=Mode.PRIVATE)
    fillet_1_piece_9b = split(fillet_1_piece_9b, bisect_by=Plane(origin=(-13.160407329, 6.43, 15.339592671), z_dir=(0, 1, 0)), keep=Keep.TOP, mode=Mode.PRIVATE)
    fillet_1_piece_9 = fillet_1_piece_9a & fillet_1_piece_9b
    add(fillet_1_piece_9, mode=Mode.SUBTRACT)

    # Фаска1
    chamfer_1_edges = [part.edges().sort_by_distance(p)[0] for p in [
        (0, 9.43, 25),
        (-2.85, 10.93, 25),
        (2.85, 10.93, 25),
        (0, 12.43, 25),
        (0, 16, 18.4),
        (0, 16, -21.6),
        (-7.075, 16, -17.531827599),
        (-5.65, 16, -20),
        (-7.075, 16, -22.468172401),
        (-9.925, 16, -22.468172401),
        (-11.35, 16, -20),
        (-9.925, 16, -17.531827599),
        (8.5, 5.93, -21.6),
        (-8.5, 5.93, -21.6),
        (8.5, 5.93, 18.4),
        (-8.5, 5.93, 18.4),
        (9.925, 16, -17.531827599),
        (11.35, 16, -20),
        (9.925, 16, -22.468172401),
        (7.075, 16, -22.468172401),
        (5.65, 16, -20),
        (7.075, 16, -17.531827599),
        (9.925, 16, 22.468172401),
        (11.35, 16, 20),
        (9.925, 16, 17.531827599),
        (7.075, 16, 17.531827599),
        (5.65, 16, 20),
        (7.075, 16, 22.468172401),
        (-7.075, 16, 22.468172401),
        (-5.65, 16, 20),
        (-7.075, 16, 17.531827599),
        (-9.925, 16, 17.531827599),
        (-11.35, 16, 20),
        (-9.925, 16, 22.468172401),
        (-2.85, 10.93, -25),
        (0, 9.43, -25),
        (2.85, 10.93, -25),
        (0, 12.43, -25),
    ]]
    chamfer(chamfer_1_edges, length=CHAMFER_1_SIZE)


solid = part.part
